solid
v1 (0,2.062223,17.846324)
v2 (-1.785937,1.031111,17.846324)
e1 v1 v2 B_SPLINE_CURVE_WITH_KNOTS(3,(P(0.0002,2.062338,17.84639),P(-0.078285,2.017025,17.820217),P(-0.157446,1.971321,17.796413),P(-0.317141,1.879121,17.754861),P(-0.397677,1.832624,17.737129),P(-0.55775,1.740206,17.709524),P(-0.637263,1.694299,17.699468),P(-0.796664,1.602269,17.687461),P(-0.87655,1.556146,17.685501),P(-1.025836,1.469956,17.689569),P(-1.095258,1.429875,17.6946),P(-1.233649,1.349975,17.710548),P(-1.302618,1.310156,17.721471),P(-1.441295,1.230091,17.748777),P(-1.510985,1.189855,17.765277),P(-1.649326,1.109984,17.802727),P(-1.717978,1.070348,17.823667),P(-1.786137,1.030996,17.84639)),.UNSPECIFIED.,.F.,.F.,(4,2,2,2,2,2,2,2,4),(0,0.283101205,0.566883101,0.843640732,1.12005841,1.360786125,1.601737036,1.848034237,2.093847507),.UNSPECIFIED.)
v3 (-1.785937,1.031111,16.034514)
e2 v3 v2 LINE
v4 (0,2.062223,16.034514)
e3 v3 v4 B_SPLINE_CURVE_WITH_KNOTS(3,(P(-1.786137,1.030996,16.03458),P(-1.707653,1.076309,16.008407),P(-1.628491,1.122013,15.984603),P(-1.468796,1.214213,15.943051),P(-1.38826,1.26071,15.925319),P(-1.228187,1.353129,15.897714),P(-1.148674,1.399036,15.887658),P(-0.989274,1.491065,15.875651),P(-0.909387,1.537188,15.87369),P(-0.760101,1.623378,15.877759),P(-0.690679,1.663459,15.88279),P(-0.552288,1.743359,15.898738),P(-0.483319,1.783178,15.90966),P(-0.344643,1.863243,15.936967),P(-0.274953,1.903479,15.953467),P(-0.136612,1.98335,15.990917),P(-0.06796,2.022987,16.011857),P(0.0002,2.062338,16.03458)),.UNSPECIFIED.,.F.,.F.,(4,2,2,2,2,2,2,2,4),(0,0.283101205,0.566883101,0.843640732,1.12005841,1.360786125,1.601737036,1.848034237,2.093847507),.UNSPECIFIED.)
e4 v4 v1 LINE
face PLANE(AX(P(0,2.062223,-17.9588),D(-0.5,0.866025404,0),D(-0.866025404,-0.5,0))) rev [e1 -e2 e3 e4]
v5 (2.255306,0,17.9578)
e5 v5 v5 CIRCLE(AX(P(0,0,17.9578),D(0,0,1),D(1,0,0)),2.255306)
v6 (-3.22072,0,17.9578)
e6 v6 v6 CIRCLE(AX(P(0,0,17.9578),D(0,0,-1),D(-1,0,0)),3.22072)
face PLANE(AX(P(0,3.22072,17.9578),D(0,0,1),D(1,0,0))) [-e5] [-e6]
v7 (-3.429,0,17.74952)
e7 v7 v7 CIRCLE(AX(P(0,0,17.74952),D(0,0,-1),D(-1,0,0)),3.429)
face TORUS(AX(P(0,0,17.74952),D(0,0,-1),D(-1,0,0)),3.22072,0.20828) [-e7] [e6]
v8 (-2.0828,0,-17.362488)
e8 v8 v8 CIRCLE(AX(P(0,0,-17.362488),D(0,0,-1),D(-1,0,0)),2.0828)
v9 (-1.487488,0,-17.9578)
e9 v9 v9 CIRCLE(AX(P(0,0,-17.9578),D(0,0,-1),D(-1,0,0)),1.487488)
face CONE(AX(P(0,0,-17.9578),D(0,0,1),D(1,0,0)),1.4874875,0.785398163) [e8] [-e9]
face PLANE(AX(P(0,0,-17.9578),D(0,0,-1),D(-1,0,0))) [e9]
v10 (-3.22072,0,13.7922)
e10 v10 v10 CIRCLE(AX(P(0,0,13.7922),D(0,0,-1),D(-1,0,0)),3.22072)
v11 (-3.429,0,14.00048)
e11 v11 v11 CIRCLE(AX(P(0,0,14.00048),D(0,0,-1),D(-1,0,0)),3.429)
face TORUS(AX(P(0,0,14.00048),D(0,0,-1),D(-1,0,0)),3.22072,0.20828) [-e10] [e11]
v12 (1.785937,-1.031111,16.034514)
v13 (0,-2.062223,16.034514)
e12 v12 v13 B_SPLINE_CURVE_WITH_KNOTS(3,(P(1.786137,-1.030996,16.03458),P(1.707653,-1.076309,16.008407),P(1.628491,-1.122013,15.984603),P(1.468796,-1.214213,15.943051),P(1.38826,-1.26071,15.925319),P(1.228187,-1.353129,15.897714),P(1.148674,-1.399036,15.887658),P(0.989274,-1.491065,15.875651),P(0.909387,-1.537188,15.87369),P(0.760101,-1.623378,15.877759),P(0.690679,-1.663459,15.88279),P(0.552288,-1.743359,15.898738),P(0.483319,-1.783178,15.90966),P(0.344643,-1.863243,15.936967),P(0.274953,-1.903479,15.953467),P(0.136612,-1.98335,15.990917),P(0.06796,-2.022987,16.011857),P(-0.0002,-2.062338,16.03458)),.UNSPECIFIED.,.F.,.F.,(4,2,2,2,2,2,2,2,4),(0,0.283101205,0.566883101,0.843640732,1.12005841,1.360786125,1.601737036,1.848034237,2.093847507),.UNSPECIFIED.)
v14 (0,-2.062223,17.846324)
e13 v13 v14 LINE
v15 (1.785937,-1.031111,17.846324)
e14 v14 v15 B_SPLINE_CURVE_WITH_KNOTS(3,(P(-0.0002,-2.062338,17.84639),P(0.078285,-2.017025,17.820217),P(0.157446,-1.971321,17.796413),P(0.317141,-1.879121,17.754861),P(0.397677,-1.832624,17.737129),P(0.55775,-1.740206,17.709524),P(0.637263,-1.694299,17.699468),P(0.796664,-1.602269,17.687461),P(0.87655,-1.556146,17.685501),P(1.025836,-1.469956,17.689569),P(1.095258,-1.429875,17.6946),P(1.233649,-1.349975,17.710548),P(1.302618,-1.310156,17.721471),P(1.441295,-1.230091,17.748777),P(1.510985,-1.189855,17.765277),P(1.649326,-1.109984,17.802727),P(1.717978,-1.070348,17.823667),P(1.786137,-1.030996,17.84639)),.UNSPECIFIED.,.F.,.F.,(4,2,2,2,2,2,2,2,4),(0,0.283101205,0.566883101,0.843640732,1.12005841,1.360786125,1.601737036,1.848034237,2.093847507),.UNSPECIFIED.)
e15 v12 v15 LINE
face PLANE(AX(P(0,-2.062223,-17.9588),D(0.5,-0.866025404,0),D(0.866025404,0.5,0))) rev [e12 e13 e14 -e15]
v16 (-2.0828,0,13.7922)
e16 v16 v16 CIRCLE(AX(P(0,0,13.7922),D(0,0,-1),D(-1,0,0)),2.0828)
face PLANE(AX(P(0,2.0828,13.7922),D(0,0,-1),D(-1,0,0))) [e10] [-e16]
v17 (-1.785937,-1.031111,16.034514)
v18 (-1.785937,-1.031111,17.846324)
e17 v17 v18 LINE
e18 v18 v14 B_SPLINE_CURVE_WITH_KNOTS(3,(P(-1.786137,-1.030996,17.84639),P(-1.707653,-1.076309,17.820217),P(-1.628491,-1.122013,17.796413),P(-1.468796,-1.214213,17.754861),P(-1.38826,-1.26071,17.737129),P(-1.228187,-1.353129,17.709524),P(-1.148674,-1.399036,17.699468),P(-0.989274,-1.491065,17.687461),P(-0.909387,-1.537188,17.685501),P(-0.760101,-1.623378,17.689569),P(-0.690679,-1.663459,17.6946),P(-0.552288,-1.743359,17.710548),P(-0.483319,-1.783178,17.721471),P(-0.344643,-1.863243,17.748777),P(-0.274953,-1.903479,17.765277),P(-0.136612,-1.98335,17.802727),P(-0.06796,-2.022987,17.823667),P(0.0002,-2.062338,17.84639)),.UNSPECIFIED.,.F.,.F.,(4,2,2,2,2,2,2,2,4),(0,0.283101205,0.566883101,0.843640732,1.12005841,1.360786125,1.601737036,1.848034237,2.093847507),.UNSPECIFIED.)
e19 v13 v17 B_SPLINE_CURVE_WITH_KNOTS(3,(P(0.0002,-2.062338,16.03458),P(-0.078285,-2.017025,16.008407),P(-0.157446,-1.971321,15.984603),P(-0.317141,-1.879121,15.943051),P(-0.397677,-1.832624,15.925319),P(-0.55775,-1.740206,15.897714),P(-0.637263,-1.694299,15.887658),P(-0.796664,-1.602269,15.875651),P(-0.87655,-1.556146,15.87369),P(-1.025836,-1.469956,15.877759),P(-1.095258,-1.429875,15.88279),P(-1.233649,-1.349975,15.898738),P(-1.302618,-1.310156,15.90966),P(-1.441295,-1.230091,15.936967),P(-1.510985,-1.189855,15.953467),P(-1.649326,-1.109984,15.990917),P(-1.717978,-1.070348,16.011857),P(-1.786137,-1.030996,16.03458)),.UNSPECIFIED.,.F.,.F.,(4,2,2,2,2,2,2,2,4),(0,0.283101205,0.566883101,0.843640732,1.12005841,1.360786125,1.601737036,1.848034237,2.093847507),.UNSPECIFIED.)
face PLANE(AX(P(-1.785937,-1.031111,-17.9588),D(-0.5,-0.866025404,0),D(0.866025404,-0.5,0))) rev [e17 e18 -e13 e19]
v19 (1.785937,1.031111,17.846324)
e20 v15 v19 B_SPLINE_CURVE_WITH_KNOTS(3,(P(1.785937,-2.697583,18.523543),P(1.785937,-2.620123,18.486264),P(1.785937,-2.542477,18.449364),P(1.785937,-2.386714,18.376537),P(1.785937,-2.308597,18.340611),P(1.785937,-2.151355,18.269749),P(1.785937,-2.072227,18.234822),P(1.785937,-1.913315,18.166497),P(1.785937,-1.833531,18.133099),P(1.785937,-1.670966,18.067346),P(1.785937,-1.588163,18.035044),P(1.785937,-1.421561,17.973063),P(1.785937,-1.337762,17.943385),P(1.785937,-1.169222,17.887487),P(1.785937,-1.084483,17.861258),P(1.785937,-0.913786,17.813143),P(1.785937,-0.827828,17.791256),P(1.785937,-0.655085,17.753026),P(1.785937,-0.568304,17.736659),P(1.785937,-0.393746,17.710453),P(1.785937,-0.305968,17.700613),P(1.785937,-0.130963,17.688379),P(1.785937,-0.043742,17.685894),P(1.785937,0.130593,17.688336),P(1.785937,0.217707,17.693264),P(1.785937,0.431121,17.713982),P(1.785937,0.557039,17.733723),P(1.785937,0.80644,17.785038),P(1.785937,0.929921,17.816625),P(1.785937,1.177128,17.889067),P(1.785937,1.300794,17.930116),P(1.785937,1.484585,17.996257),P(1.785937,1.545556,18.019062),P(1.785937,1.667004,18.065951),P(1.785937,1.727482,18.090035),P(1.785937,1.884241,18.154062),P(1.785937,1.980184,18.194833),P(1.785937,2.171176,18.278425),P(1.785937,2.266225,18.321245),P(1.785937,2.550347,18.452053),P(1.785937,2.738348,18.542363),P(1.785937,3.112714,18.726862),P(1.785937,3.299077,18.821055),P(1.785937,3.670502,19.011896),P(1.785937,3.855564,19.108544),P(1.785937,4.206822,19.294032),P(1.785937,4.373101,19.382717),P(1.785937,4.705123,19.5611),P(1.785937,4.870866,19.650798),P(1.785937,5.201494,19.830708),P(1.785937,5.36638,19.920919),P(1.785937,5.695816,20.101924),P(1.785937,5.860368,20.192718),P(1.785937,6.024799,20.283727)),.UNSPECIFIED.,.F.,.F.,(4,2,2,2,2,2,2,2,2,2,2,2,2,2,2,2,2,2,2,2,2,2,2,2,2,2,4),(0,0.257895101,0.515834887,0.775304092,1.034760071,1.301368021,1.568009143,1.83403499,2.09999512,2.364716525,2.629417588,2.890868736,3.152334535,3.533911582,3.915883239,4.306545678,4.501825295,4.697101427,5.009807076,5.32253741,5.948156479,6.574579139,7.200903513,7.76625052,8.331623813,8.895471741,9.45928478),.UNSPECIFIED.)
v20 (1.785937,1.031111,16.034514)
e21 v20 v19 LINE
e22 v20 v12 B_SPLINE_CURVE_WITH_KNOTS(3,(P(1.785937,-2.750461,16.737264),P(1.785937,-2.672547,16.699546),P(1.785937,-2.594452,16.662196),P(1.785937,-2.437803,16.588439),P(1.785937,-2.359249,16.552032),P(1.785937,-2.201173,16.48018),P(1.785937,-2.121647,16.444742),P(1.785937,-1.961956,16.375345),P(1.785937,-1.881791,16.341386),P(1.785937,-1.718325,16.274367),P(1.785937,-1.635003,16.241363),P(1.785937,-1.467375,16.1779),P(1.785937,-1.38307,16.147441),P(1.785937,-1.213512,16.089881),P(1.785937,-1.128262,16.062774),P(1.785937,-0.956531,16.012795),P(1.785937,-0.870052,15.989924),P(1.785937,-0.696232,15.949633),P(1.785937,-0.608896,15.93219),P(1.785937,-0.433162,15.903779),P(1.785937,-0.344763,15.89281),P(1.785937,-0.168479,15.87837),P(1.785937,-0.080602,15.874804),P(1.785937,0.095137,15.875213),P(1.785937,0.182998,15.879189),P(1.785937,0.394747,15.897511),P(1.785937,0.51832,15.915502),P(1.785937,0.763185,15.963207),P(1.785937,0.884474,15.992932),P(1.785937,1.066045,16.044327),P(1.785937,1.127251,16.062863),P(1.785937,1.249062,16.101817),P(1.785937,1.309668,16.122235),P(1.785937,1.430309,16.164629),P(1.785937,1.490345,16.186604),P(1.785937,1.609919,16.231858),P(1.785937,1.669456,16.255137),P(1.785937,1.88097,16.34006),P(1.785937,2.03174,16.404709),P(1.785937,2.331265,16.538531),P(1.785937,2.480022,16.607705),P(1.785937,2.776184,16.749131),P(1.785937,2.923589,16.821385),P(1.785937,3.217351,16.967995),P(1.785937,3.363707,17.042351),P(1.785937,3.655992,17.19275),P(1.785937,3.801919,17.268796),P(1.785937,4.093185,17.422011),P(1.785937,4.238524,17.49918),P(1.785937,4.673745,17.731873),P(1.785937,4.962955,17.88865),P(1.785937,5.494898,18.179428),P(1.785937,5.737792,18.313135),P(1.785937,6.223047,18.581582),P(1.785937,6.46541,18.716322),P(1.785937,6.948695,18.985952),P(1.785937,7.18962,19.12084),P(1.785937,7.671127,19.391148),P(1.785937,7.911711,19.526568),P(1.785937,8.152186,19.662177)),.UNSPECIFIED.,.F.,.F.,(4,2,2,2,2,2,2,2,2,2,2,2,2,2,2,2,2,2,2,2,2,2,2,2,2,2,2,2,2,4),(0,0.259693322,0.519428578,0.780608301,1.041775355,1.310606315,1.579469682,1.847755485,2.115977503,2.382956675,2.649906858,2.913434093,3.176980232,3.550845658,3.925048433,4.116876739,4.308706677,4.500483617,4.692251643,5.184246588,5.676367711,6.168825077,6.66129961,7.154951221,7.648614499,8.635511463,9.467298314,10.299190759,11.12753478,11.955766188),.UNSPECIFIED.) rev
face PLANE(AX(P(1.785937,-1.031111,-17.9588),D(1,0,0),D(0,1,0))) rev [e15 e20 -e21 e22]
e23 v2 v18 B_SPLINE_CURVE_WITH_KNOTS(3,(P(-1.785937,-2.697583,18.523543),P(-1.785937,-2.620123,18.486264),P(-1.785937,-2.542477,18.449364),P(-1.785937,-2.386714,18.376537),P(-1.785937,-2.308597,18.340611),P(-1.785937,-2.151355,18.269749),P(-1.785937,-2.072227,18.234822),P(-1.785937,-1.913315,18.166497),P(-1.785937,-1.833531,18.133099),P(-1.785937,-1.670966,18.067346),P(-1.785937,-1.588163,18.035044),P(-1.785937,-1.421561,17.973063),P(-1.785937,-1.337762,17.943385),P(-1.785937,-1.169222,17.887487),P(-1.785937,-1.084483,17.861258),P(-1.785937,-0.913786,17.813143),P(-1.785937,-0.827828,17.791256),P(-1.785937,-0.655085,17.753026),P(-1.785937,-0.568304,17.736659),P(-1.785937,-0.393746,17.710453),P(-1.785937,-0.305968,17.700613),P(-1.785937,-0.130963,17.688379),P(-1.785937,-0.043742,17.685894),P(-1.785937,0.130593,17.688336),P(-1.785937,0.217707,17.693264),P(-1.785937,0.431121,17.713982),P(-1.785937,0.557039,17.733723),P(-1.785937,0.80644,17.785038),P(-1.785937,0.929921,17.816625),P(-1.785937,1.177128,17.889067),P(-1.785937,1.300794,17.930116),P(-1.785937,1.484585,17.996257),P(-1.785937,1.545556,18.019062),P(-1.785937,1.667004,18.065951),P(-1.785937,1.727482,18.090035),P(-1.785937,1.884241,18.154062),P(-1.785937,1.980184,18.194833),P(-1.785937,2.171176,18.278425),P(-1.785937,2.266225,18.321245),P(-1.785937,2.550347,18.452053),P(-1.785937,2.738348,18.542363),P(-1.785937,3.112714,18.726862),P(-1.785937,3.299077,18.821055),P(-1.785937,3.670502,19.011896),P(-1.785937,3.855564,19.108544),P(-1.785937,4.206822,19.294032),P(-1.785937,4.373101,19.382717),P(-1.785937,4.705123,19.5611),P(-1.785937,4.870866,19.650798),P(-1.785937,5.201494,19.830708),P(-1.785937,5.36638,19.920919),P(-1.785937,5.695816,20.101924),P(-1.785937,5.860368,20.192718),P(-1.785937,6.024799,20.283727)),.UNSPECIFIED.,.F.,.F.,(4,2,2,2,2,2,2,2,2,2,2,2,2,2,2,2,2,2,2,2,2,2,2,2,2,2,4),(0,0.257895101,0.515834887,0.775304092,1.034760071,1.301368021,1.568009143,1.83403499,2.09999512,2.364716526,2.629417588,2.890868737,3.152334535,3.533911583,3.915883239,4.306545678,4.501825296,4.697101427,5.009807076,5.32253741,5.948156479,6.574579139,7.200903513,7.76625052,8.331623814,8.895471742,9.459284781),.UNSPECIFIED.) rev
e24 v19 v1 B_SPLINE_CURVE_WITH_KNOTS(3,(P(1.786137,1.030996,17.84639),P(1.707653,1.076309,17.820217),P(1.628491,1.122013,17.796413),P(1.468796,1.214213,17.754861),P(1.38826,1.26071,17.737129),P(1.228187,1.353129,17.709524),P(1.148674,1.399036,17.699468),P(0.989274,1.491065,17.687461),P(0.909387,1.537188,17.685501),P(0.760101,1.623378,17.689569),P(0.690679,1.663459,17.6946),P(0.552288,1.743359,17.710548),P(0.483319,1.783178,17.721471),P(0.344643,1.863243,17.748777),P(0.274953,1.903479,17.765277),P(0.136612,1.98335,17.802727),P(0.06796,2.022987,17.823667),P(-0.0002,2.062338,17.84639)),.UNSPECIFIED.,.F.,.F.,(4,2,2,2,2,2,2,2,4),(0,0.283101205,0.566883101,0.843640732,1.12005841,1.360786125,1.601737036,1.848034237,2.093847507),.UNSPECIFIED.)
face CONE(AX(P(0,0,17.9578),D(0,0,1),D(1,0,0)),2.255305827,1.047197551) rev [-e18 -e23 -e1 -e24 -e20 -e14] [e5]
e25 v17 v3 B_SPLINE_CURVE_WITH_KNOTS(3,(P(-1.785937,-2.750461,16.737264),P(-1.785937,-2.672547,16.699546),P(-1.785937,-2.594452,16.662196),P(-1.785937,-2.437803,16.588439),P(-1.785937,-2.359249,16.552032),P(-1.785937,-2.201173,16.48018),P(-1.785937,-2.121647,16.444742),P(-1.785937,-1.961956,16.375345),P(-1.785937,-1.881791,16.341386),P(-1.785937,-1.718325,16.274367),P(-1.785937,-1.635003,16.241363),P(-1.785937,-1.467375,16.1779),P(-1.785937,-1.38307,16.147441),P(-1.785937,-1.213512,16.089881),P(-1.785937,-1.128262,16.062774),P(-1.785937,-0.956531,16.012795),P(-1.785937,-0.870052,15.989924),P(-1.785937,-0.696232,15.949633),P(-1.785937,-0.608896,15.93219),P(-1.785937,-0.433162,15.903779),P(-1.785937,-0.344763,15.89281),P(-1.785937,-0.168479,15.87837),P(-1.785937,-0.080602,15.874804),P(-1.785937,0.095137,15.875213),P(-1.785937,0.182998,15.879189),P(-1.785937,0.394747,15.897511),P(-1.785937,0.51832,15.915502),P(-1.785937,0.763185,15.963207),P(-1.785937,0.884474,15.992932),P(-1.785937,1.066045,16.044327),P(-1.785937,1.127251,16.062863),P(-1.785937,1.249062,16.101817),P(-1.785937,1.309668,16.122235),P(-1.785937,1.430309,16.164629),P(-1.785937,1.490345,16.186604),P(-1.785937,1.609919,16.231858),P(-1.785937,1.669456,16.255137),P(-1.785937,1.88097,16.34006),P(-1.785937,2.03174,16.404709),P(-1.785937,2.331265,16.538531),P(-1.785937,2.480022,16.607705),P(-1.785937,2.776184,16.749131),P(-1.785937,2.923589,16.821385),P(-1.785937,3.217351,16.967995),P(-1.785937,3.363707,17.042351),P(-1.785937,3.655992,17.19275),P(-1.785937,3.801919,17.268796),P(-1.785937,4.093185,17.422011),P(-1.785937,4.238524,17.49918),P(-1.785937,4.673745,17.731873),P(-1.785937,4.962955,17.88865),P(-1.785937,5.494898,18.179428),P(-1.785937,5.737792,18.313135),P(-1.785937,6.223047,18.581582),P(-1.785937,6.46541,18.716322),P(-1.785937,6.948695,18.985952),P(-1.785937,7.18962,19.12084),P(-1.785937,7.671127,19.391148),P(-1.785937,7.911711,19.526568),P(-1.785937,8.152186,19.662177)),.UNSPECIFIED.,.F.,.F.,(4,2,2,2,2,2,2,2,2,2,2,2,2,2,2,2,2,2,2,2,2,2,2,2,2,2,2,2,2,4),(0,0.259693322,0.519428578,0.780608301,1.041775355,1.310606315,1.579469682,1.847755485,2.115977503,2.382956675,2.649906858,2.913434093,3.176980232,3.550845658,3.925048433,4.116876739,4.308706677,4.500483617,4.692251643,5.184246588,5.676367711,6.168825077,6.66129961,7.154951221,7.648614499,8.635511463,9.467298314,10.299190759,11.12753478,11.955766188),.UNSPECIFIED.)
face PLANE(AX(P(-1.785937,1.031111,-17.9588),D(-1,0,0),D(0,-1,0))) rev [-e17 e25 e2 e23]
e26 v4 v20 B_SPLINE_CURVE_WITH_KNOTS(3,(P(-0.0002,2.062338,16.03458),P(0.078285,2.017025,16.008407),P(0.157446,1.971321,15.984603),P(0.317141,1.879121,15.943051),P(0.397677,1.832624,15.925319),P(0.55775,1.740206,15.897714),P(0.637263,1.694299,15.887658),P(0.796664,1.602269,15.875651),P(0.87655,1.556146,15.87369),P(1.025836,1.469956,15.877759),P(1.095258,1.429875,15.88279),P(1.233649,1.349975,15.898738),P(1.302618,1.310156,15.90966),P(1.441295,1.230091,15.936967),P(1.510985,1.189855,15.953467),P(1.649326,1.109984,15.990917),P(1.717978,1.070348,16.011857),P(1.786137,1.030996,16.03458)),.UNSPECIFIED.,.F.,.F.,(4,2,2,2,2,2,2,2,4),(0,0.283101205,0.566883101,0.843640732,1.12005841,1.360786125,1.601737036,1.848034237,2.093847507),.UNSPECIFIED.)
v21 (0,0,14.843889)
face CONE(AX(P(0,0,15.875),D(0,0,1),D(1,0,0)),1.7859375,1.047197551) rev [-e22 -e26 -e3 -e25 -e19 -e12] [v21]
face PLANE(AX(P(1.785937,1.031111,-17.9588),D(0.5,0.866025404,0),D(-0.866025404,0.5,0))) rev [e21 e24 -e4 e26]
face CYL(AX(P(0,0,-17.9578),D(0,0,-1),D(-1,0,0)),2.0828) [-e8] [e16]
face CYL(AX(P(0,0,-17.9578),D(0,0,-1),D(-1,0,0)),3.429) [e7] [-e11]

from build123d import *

# Parameters (mm, degrees)
CUT_EXTRUDE1_REACH = 38.559
CUT_EXTRUDE1_START = 17.9578


with BuildPart() as part:
    # Sketch2 → Revolve1 (revolve)
    with BuildSketch(Plane(origin=(0, 0, 0), x_dir=(0, 0, -1), z_dir=(1, 0, 0))):
        with BuildLine():
            Line((17.9578, 0), (17.9578, 1.4874875))
            Line((17.9578, 1.4874875), (17.3624875, 2.0828))
            Line((17.3624875, 2.0828), (-13.7922, 2.0828))
            Line((-13.7922, 2.0828), (-13.7922, 3.22072))
            ThreePointArc((-13.7922, 3.22072), (-13.8532038, 3.3679962), (-14.00048, 3.429))
            Line((-14.00048, 3.429), (-17.74952, 3.429))
            ThreePointArc((-17.74952, 3.429), (-17.8967962, 3.3679962), (-17.9578, 3.22072))
            Line((-17.9578, 3.22072), (-17.9578, 1.7859375))
            Line((-17.9578, 1.7859375), (-15.875, 1.7859375))
            Line((-15.875, 1.7859375), (-14.843888504, 0))
            Line((-14.843888504, 0), (17.9578, 0))
        make_face()
    revolve(axis=Axis((0, 0, -17.9578), (0, 0, 1)))

    # Cut-Extrude1: up to this cone (the profile starts inside it)
    cut_extrude1_end = Plane(origin=(0, 0, 17.9578), z_dir=(0, 0, 1)).offset(-3.113910496) * Cone(1.732e-06, 82.387359904, 47.566363418, align=(Align.CENTER, Align.CENTER, Align.MIN), mode=Mode.PRIVATE)
    # Sketch3 → Cut-Extrude1 (cut, up to the surface)
    with BuildSketch(Plane.XY.offset(CUT_EXTRUDE1_START), mode=Mode.PRIVATE) as cut_extrude1_sk1:
        Polygon((-1.7859375, 1.031111496), (-1.7859375, -1.031111496), (0, -2.062222993), (1.7859375, -1.031111496), (1.7859375, 1.031111496), (0, 2.062222993), align=None)
    cut_extrude1_tool1 = extrude(cut_extrude1_sk1.sketch, amount=-CUT_EXTRUDE1_REACH, mode=Mode.PRIVATE) & cut_extrude1_end
    add(cut_extrude1_tool1.solids().sort_by_distance((0, 0, 17.9578))[0], mode=Mode.SUBTRACT)

    # Cut-Extrude2 cone 1 section (through the dimple's axis) → Cut-Extrude2 (revolve, cut)
    with BuildSketch(Plane(origin=(0, 0, 17.9578), x_dir=(0, -1, 0), z_dir=(1, 0, 0))):
        Polygon((0, 0), (2.255305827, 0), (0, 1.302101426), align=None)
    revolve(axis=Axis((0, 0, 17.9578), (0, 0, -1)), mode=Mode.SUBTRACT)


solid = part.part
